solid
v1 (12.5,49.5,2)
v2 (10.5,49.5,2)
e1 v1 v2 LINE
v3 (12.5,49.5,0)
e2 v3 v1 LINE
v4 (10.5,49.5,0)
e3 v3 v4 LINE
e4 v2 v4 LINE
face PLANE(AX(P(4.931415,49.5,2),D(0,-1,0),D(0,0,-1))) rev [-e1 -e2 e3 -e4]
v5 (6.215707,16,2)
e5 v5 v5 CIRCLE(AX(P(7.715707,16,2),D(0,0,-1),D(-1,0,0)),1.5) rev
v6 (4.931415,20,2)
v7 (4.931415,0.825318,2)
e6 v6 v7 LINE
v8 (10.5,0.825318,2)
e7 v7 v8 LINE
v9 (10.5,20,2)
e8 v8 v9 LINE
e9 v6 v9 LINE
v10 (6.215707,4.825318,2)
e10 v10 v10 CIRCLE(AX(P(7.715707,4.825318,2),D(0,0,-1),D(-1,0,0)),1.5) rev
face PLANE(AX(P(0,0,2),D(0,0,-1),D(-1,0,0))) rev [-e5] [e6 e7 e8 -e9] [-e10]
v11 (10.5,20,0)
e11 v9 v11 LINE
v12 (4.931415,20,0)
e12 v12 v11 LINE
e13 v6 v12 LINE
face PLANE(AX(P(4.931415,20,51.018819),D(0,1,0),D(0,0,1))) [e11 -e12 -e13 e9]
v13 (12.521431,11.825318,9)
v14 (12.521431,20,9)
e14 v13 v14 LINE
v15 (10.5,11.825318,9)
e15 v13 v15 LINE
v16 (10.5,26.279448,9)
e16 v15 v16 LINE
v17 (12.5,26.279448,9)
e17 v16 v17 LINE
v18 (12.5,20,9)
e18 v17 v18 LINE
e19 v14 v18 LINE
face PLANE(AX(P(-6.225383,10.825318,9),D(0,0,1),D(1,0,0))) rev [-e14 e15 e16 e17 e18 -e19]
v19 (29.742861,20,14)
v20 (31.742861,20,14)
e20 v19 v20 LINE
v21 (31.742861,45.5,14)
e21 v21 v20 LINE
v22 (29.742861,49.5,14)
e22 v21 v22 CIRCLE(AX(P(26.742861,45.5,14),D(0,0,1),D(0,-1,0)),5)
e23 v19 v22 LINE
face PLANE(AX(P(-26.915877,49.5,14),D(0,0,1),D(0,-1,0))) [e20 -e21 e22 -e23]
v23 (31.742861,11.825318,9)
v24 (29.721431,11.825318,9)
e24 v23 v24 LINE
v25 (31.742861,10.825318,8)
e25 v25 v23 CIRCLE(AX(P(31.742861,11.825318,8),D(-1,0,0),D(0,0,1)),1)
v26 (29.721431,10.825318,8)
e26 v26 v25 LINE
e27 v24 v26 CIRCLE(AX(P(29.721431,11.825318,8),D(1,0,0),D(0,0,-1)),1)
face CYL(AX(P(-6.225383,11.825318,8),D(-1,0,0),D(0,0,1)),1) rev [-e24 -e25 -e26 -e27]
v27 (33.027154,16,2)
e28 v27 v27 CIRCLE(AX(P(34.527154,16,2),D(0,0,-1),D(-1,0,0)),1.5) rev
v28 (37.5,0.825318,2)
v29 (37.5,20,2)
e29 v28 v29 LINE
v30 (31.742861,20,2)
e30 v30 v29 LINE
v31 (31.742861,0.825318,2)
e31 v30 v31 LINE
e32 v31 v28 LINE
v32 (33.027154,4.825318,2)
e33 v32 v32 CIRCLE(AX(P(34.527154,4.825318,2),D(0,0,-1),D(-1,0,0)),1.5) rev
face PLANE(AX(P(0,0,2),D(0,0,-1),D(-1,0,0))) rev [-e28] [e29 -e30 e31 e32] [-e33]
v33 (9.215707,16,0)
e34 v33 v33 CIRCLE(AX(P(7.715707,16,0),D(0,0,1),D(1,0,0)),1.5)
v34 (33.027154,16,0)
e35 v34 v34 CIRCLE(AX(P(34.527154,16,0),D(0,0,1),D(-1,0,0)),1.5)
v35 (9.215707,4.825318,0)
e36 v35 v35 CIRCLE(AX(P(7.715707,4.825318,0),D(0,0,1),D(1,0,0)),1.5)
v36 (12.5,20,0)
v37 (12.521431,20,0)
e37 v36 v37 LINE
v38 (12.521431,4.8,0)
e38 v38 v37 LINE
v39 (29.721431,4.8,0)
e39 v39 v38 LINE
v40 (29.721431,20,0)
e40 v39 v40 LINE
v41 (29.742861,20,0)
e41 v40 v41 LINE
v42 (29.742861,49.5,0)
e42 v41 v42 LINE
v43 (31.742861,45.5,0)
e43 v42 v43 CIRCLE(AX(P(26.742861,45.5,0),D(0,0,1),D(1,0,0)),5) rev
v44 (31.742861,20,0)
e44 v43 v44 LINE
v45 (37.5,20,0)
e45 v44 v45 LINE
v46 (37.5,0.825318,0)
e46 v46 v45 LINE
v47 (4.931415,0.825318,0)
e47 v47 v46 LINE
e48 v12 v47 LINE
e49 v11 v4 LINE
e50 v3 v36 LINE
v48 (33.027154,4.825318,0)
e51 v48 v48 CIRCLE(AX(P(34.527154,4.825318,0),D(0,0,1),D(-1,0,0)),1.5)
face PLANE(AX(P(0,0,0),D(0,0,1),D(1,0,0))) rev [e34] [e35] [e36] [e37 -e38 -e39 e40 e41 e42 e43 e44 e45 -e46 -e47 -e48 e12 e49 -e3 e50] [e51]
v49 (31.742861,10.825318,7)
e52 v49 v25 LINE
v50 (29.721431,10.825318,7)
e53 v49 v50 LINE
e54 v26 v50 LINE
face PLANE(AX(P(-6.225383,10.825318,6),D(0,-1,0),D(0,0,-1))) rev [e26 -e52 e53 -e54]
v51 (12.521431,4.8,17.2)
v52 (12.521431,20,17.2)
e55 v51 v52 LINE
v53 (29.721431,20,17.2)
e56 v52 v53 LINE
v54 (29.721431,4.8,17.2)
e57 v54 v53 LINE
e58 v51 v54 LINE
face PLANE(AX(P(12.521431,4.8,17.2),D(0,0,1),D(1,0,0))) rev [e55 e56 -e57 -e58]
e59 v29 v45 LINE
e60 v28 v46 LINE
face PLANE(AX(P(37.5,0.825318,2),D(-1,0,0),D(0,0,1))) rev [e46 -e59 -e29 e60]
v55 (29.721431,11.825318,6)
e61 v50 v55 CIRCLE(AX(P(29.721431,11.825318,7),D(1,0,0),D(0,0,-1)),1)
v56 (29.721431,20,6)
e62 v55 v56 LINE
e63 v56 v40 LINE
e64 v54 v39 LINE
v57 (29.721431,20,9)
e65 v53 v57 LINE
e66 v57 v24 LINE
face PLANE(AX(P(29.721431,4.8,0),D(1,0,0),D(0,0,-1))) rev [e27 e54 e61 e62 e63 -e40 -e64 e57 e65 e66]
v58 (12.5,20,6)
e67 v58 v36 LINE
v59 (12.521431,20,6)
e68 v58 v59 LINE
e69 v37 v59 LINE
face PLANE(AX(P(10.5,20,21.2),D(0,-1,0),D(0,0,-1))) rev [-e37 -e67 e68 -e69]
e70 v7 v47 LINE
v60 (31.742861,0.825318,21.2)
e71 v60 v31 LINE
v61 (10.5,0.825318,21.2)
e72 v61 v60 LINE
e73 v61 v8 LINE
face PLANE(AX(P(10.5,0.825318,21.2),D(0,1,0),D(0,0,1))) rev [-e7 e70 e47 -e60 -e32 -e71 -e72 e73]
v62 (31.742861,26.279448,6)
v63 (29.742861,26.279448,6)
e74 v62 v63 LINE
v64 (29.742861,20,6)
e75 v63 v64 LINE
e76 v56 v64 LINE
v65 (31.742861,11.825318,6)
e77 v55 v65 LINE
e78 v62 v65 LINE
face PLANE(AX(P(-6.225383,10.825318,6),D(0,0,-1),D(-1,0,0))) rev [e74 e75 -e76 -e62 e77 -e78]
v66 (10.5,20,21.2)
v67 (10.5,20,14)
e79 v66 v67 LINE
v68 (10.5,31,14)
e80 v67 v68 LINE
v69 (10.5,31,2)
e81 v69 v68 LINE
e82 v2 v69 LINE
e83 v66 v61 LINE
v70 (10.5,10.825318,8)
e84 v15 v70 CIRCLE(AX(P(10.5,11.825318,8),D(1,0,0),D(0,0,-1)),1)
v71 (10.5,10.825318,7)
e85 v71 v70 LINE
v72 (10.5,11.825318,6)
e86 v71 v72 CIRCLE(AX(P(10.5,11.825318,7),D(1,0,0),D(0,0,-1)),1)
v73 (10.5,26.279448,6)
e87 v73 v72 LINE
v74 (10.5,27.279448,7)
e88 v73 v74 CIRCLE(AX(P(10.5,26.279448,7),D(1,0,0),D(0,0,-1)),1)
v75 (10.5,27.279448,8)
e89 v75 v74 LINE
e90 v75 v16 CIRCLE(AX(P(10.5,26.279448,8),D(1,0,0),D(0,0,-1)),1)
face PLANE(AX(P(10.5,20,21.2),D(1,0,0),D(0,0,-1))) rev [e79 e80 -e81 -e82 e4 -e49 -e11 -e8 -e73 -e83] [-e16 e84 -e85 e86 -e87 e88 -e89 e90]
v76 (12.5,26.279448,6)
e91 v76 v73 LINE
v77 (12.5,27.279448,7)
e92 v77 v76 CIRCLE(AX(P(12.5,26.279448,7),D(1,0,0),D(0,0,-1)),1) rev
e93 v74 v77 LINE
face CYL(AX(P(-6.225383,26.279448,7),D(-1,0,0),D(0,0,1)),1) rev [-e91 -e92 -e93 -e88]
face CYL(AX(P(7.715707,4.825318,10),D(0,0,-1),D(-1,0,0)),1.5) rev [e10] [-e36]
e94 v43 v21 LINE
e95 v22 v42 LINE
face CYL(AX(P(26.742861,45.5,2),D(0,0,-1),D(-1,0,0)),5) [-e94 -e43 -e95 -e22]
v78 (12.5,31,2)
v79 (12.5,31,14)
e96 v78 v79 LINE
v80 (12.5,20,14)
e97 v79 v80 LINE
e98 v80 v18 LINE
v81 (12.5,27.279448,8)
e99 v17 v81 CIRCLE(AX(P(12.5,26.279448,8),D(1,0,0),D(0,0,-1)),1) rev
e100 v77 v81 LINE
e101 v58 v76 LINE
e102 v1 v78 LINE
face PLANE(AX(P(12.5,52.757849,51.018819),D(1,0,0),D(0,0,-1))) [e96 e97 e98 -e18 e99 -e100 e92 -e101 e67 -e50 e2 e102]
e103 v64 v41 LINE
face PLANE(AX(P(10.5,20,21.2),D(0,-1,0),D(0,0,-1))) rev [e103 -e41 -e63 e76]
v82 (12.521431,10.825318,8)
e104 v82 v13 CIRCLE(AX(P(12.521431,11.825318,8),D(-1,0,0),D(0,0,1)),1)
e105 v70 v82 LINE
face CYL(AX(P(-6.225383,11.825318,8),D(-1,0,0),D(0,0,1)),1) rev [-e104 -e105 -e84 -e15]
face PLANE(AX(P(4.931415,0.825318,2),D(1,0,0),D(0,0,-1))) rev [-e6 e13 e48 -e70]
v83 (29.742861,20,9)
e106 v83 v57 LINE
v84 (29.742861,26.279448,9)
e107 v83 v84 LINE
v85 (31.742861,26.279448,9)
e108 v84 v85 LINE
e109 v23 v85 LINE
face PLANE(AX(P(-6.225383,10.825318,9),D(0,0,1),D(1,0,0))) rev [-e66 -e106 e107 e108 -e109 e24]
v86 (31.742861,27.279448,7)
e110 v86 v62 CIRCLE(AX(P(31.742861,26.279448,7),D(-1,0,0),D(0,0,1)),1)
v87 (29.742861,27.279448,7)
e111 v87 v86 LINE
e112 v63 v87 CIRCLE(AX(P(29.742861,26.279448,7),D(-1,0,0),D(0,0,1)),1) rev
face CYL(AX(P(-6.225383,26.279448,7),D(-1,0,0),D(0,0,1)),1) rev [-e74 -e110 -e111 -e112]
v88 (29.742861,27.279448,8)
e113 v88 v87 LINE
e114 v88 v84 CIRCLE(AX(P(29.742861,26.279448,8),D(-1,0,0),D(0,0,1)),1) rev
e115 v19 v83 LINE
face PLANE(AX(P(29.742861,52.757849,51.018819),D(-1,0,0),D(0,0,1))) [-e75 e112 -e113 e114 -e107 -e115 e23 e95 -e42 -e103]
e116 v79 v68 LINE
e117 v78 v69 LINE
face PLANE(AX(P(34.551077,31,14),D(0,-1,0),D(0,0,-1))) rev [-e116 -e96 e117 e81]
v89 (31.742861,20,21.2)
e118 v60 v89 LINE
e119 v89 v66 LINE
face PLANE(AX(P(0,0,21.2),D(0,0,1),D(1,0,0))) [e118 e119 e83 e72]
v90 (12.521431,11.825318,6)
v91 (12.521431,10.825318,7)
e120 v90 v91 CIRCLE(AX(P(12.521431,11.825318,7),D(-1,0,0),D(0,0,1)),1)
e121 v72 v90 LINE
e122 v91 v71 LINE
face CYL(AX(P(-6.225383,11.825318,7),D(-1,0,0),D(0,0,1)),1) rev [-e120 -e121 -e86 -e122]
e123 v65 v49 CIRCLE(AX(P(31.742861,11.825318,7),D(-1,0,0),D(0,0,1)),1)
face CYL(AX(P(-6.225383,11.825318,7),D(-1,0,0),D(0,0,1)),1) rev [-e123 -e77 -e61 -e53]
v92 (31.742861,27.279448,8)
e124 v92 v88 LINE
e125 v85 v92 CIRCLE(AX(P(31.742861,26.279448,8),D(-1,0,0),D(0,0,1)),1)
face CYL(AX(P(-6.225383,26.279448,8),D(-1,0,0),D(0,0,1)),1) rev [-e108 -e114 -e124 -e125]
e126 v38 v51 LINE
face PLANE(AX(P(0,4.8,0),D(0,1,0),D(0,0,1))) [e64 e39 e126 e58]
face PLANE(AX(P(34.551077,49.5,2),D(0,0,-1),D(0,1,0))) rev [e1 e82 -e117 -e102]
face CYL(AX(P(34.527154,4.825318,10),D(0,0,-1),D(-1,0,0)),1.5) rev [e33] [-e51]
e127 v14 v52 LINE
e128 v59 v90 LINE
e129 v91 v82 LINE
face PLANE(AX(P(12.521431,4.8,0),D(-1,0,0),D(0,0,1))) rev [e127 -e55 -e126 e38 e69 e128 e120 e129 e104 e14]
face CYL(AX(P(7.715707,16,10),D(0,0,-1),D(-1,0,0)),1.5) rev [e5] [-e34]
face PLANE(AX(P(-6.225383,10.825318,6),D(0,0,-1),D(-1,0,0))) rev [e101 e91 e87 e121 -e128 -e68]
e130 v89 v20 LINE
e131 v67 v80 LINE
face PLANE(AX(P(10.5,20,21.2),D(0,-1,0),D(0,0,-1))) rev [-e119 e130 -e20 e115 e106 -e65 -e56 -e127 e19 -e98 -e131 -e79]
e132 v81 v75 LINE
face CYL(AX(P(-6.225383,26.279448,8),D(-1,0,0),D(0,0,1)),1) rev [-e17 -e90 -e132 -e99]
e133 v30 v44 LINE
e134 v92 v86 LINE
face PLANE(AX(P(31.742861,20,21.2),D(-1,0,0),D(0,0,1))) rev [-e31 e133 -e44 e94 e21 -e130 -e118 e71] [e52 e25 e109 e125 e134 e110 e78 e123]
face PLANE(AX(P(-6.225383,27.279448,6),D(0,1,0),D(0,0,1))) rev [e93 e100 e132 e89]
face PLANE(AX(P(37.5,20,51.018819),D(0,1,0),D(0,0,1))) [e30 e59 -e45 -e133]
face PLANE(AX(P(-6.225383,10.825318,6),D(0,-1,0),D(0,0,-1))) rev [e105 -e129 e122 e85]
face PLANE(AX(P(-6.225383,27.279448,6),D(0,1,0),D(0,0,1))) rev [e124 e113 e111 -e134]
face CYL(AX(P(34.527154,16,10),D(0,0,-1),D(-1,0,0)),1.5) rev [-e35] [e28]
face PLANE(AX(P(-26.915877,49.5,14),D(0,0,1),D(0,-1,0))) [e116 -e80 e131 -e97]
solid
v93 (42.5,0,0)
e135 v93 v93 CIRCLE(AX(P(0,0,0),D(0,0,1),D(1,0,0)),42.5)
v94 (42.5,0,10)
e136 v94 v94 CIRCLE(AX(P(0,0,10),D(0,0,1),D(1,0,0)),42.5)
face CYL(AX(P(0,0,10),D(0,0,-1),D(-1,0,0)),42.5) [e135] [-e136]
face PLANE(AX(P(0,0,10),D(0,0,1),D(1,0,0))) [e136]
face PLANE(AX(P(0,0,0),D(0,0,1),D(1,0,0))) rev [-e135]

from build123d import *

# Parameters (mm, degrees)
SKETCH4_R           = 42.5
BASE_DEPTH          = 10
SKETCH10_W          = 21.242861366
SKETCH10_H          = 19.174682453
BOSS_EXTRUDE1_DEPTH = 21.2
SKETCH11_W          = 32.5685853
SKETCH11_H          = 48.674682453
BOSS_EXTRUDE2_DEPTH = 2
SKETCH13_W          = 17.2
SKETCH13_H          = 17.2
CUT_EXTRUDE2_DEPTH  = 15.2
BOSS_EXTRUDE4_REACH = 98.435
SKETCH17_W          = 12
SKETCH17_H          = 29.5
SKETCH12_W          = 5.5685853
SKETCH12_H          = 32.757849033
SKETCH12_W_2        = 17.242861366
SKETCH12_W_3        = 5.757138634
CUT_EXTRUDE3_DEPTH  = 14
CUT_EXTRUDE4_REACH  = 98.435
SKETCH18_W          = 3
SKETCH18_H          = 16.454130829
FILLET1_R           = 5
FILLET2_R           = 1
SKETCH19_R          = 1.5
CUT_EXTRUDE5_DEPTH  = 10
SKETCH21_W          = 12
SKETCH21_H          = 18.5
CUT_EXTRUDE6_DEPTH  = 2


with BuildPart() as part:
    # Sketch4 → base (new body)
    with BuildSketch(Plane.XY):
        Circle(SKETCH4_R)
    extrude(amount=BASE_DEPTH)


with BuildPart() as body_2:
    # Sketch10 → Boss-Extrude1 (new body)
    with BuildSketch(Plane.XY):
        with Locations((21.121430683, 10.412658774)):
            Rectangle(SKETCH10_W, SKETCH10_H)
    extrude(amount=BOSS_EXTRUDE1_DEPTH)

    # Sketch11 → Boss-Extrude2 (add)
    with BuildSketch(Plane.XY):
        with Locations((21.21570735, 25.162658773)):
            Rectangle(SKETCH11_W, SKETCH11_H)
    extrude(amount=BOSS_EXTRUDE2_DEPTH)

    # Sketch13 → Cut-Extrude2 (cut)
    with BuildSketch(Plane(origin=(0, 20, 0), x_dir=(1, 0, 0), z_dir=(0, 1, 0))):
        with Locations((21.121430683, -8.6)):
            Rectangle(SKETCH13_W, SKETCH13_H)
    extrude(amount=-CUT_EXTRUDE2_DEPTH, mode=Mode.SUBTRACT)

    # Boss-Extrude4: up to this face of the body (flat: up to its plane)
    boss_extrude4_end = Plane(body_2.part.faces().sort_by_distance((4.9314147, 25.162658774, 1))[0])
    # Sketch17 → Boss-Extrude4 (add, up to the picked face)
    with BuildSketch(Plane(origin=(37.5, 0, 0), x_dir=(0, 0, -1), z_dir=(1, 0, 0)), mode=Mode.PRIVATE) as boss_extrude4_sk1:
        with Locations((-8, 34.75)):
            Rectangle(SKETCH17_W, SKETCH17_H)
    boss_extrude4_tool1 = split(extrude(boss_extrude4_sk1.sketch, amount=-BOSS_EXTRUDE4_REACH, mode=Mode.PRIVATE), bisect_by=boss_extrude4_end, keep=Keep.BOTH, mode=Mode.PRIVATE)
    add(boss_extrude4_tool1.solids().sort_by(Axis((37.5, 34.75, 8), (-1, 0, 0)))[0])

    # Sketch12 → Cut-Extrude3 (cut)
    with BuildSketch(Plane.XY):
        with Locations((7.71570735, 36.378924517)):
            Rectangle(SKETCH12_W, SKETCH12_H)
        with Locations((21.121430683, 36.378924517)):
            Rectangle(SKETCH12_W_2, SKETCH12_H)
        with Locations((34.621430683, 36.378924517)):
            Rectangle(SKETCH12_W_3, SKETCH12_H)
    extrude(amount=CUT_EXTRUDE3_DEPTH, mode=Mode.SUBTRACT)

    # Cut-Extrude4: up to this face of the body (flat: up to its plane)
    cut_extrude4_end = Plane(body_2.part.faces().sort_by_distance((10.5, 23.279933566, 9.167956849))[0])
    # Sketch18 → Cut-Extrude4 (cut, up to the picked face)
    with BuildSketch(Plane(origin=(37.5, 0, 0), x_dir=(0, 0, -1), z_dir=(1, 0, 0)), mode=Mode.PRIVATE) as cut_extrude4_sk1:
        with Locations((-7.5, 19.052382962)):
            Rectangle(SKETCH18_W, SKETCH18_H)
    cut_extrude4_tool1 = split(extrude(cut_extrude4_sk1.sketch, amount=-CUT_EXTRUDE4_REACH, mode=Mode.PRIVATE), bisect_by=cut_extrude4_end, keep=Keep.BOTH, mode=Mode.PRIVATE)
    add(cut_extrude4_tool1.solids().sort_by(Axis((37.5, 19.052383, 7.5), (-1, 0, 0)))[0], mode=Mode.SUBTRACT)

    # Fillet1
    # the kernel refuses this fillet: 5 mm, written as the material it takes off along each edge
    with BuildSketch(Plane(origin=(31.742861366, 49.5, 24), x_dir=(0, -1, 0), z_dir=(0, 0, -1))) as fillet1_piece_1:
        with BuildLine():
            CenterArc((4, 5), FILLET1_R, 216.869897646, 53.130102354)
            Line((0, 2), (-0.08, 1.94))
            ThreePointArc((-0.08, 1.94), (-0.1, 1), (-0.1, 0))
            Line((-0.1, 0), (0, -0.1))
            Line((0, -0.1), (4, -0.1))
            Line((4, -0.1), (4, 0))
        make_face()
    extrude(amount=34, mode=Mode.SUBTRACT)

    # Fillet2
    fillet2_edges = [body_2.edges().sort_by_distance(p)[0] for p in [
        (30.732146025, 10.825317547, 6),
        (11.510715342, 10.825317547, 6),
        (30.742861366, 27.279448376, 6),
        (11.5, 27.279448376, 6),
        (30.732146025, 10.825317547, 9),
        (11.510715342, 10.825317547, 9),
        (30.742861366, 27.279448376, 9),
        (11.5, 27.279448376, 9),
    ]]
    fillet(fillet2_edges, radius=FILLET2_R)

    # Sketch19 → Cut-Extrude5 (cut)
    with BuildSketch(Plane.XY):
        with Locations(Location((7.71570735, 16, 0), (0, 0, 180))):
            Circle(SKETCH19_R)
        with Locations(Location((7.71570735, 4.825317547, 0), (0, 0, 180))):
            Circle(SKETCH19_R)
        with Locations(Location((34.527154016, 4.825317547, 0), (0, 0, 180))):
            Circle(SKETCH19_R)
        with Locations(Location((34.527154016, 16, 0), (0, 0, 180))):
            Circle(SKETCH19_R)
    extrude(amount=CUT_EXTRUDE5_DEPTH, mode=Mode.SUBTRACT)

    # Sketch21 → Cut-Extrude6 (cut)
    with BuildSketch(Plane.ZY.offset(-10.5)):
        with Locations((8, 40.25)):
            Rectangle(SKETCH21_W, SKETCH21_H)
    extrude(amount=-CUT_EXTRUDE6_DEPTH, mode=Mode.SUBTRACT)


solid = Compound([part.part, body_2.part])
